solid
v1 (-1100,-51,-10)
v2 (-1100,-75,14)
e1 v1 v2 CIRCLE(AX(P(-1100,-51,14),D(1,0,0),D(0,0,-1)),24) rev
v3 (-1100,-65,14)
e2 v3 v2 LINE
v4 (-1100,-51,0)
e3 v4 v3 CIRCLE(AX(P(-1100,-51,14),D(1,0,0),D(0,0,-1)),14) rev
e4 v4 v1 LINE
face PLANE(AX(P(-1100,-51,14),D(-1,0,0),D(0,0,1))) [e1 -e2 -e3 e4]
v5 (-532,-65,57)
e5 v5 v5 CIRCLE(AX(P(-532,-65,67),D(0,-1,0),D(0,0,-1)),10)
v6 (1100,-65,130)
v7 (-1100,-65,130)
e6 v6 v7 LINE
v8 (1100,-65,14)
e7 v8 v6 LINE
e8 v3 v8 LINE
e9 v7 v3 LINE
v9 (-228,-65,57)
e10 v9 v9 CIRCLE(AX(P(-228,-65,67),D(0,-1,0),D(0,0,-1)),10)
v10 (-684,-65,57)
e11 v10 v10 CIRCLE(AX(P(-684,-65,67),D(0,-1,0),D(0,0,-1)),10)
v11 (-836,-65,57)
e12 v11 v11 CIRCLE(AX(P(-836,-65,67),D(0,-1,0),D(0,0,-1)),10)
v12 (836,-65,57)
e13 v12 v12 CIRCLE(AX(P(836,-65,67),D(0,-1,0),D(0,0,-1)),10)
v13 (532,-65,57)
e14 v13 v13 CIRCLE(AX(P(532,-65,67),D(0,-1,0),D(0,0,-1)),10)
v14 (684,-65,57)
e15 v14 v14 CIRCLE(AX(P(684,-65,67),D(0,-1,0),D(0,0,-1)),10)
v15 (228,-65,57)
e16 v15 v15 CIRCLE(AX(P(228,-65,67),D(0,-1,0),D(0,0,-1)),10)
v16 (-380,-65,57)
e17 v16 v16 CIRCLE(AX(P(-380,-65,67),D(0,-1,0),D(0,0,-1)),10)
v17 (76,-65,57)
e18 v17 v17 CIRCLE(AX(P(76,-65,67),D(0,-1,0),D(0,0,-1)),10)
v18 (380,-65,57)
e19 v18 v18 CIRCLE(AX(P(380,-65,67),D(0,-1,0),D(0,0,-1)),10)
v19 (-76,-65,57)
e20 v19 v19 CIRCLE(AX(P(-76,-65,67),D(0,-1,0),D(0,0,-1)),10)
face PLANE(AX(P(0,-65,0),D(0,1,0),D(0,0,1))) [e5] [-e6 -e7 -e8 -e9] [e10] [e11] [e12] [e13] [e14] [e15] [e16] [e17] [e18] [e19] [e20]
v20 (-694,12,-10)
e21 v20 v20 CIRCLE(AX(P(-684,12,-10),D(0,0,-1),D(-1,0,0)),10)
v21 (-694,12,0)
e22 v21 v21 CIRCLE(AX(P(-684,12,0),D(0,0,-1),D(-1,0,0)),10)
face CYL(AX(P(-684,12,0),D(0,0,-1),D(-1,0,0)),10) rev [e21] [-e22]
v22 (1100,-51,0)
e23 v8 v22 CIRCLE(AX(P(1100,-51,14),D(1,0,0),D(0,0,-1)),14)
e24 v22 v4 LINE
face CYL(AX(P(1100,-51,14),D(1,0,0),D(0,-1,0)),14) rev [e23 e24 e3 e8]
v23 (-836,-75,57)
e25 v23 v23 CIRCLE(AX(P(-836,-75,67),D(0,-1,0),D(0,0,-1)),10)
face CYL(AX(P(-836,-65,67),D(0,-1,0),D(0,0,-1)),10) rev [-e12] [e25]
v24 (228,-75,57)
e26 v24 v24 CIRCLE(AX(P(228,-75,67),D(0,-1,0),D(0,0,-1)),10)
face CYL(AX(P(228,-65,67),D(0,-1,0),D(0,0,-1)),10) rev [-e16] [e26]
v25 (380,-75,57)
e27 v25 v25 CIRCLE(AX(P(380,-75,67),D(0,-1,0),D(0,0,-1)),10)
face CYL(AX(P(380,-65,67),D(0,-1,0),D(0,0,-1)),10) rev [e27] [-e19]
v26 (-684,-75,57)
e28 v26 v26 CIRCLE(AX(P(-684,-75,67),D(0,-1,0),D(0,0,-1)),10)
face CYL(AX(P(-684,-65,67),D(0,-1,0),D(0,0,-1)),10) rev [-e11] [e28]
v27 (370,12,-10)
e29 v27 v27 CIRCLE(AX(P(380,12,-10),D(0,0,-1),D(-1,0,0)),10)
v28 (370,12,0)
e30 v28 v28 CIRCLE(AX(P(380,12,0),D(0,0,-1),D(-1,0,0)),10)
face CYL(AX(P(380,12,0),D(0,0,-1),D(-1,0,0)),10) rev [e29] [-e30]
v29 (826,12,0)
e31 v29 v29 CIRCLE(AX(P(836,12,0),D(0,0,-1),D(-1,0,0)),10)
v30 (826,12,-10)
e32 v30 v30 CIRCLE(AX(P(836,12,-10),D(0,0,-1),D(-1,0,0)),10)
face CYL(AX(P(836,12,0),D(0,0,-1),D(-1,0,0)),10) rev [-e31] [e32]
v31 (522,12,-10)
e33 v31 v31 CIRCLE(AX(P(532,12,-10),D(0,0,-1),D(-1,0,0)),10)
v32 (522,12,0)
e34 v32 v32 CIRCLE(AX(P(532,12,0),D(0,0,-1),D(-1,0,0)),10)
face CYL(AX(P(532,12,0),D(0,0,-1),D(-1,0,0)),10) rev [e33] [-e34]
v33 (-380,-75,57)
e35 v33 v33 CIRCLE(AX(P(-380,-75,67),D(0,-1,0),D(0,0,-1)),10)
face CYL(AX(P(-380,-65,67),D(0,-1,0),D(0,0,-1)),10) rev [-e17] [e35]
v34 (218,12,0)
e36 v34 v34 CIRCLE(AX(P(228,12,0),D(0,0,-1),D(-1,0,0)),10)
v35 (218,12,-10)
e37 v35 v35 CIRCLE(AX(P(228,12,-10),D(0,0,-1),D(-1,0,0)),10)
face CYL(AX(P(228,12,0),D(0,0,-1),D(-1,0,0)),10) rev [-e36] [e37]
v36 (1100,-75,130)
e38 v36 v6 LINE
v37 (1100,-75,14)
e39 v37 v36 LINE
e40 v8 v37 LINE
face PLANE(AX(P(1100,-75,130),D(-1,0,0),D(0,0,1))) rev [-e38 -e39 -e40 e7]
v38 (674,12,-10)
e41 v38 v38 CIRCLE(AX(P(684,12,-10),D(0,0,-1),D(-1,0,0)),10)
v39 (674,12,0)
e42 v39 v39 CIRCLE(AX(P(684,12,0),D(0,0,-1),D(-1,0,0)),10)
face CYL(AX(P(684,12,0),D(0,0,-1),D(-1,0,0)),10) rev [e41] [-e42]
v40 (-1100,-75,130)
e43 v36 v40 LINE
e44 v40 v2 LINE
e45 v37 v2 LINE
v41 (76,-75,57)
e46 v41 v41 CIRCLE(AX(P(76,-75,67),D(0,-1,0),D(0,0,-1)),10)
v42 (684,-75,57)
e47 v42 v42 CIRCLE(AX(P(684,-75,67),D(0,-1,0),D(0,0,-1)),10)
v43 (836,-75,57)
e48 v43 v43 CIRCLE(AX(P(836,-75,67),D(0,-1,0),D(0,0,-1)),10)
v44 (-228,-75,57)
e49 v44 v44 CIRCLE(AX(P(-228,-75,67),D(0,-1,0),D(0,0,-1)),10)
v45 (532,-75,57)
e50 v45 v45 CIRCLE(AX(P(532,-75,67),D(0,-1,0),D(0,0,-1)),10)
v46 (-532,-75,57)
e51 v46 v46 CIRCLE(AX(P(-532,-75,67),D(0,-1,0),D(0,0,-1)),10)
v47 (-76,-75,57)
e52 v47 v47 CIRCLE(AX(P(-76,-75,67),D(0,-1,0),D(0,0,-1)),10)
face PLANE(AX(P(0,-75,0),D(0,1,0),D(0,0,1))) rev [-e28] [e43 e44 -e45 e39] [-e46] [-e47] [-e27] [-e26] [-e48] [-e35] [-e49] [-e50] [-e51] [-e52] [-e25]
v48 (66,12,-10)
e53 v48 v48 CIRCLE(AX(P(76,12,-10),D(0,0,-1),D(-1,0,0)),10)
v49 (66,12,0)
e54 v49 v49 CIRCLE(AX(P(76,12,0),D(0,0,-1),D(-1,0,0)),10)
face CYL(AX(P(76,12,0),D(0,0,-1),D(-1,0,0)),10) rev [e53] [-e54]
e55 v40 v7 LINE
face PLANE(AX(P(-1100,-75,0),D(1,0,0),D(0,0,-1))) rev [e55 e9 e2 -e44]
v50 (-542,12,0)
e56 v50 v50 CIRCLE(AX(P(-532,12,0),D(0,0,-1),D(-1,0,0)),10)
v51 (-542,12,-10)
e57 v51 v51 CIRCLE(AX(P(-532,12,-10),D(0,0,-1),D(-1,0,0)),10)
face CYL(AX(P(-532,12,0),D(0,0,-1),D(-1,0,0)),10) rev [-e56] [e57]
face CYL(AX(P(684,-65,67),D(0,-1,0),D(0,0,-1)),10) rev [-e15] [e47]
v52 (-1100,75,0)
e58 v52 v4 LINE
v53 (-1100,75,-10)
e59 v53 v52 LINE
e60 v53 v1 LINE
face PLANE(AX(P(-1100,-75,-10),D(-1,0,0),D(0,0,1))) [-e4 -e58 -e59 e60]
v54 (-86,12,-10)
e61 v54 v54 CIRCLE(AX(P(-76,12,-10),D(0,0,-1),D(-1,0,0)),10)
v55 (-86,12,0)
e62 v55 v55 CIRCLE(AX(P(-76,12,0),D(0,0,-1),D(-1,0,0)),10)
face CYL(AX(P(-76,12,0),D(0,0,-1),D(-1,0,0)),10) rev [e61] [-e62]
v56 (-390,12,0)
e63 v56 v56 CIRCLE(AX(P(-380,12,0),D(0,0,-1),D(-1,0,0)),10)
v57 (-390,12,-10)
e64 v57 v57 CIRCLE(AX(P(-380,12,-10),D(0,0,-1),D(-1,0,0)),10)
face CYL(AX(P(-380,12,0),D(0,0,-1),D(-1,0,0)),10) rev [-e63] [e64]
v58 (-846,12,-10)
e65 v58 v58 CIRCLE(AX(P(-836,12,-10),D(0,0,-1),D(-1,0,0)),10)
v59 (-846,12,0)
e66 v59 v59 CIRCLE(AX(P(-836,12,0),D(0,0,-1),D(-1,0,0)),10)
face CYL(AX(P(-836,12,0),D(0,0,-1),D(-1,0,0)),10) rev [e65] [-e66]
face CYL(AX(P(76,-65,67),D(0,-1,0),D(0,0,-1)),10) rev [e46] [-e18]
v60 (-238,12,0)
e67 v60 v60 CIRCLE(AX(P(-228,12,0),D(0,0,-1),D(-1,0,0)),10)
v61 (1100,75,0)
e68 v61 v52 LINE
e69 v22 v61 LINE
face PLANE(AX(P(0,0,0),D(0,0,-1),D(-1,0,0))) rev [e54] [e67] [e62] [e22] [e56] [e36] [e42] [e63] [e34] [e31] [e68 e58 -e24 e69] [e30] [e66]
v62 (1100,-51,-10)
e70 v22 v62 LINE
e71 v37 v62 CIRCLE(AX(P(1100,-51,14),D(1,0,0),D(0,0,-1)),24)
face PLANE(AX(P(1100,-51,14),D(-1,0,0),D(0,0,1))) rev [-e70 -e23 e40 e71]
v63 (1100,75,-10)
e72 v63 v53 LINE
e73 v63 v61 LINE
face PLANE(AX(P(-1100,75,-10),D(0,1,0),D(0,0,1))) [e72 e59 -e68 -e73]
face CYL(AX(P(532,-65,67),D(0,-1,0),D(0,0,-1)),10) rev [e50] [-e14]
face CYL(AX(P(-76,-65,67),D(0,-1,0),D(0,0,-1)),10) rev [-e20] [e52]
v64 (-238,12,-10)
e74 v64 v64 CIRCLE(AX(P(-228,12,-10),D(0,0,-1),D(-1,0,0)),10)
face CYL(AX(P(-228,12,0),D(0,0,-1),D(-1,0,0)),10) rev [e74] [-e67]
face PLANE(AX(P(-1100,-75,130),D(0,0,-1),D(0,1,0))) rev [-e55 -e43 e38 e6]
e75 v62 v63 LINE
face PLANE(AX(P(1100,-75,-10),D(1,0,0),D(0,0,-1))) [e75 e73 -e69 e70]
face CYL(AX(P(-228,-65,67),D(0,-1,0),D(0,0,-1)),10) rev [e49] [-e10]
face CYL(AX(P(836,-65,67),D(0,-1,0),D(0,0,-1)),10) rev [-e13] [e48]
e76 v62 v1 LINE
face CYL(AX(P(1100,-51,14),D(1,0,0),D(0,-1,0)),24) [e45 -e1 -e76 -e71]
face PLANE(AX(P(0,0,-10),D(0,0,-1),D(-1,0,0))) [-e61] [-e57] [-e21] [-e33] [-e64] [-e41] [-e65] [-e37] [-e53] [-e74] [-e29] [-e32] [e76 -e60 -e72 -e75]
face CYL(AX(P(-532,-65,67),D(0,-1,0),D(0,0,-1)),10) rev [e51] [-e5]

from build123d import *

# Parameters (mm, degrees)
SKETCH1_W                    = 2200
SKETCH1_H                    = 150
BASE_FLANGE1_DEPTH           = 10
EDGE_FLANGE1_STRIP_W         = 68
EDGE_FLANGE1_STRIP_H         = 10
EDGE_FLANGE1_STRIP_CUT_DEPTH = 2200
EDGE_FLANGE1_DEPTH           = 2200
SKETCH12_R                   = 10
CUT_EXTRUDE1_DEPTH           = 10
SKETCH13_R                   = 10
CUT_EXTRUDE2_DEPTH           = 10
LPATTERN1_COUNT              = 12
LPATTERN1_PITCH              = 152


# Sheet-metal steps are written as plain solids
with BuildPart() as part:
    # Sketch1 → Base-Flange1 (new body)
    with BuildSketch(Plane.XY):
        Rectangle(SKETCH1_W, SKETCH1_H)
    extrude(amount=-BASE_FLANGE1_DEPTH)

    # Edge-Flange1 strip (across the edge) → Edge-Flange1 strip cut (cut)
    with BuildSketch(Plane(origin=(-1100, -75, 0), x_dir=(0, 1, 0), z_dir=(1, 0, 0))):
        with Locations((-10, -5)):
            Rectangle(EDGE_FLANGE1_STRIP_W, EDGE_FLANGE1_STRIP_H)
    extrude(amount=EDGE_FLANGE1_STRIP_CUT_DEPTH, mode=Mode.SUBTRACT)

    # Edge-Flange1 section (across the edge) → Edge-Flange1 (add)
    with BuildSketch(Plane(origin=(-1100, -75, 0), x_dir=(0, 1, 0), z_dir=(1, 0, 0))):
        with BuildLine():
            Line((0, 14), (0, 130))
            Line((0, 130), (10, 130))
            Line((10, 130), (10, 14))
            ThreePointArc((10, 14), (14.100505063, 4.100505063), (24, 0))
            Line((24, 0), (24, -10))
            ThreePointArc((24, -10), (7.029437252, -2.970562748), (0, 14))
        make_face()
    extrude(amount=EDGE_FLANGE1_DEPTH)

    # Sketch12 → Cut-Extrude1 (cut)
    with BuildSketch(Plane(origin=(0, -75, 0), x_dir=(-1, 0, 0), z_dir=(0, -1, 0))):
        with Locations(Location((836, -67, 0), (0, 0, 90))):
            Circle(SKETCH12_R)
    cut_extrude1 = extrude(amount=-CUT_EXTRUDE1_DEPTH, mode=Mode.SUBTRACT)

    # Sketch13 → Cut-Extrude2 (cut)
    with BuildSketch(Plane(origin=(0, 0, -10), x_dir=(-1, 0, 0), z_dir=(0, 0, -1))):
        with Locations((836, 12)):
            Circle(SKETCH13_R)
    cut_extrude2 = extrude(amount=-CUT_EXTRUDE2_DEPTH, mode=Mode.SUBTRACT)

    # LPattern1: Cut-Extrude1, Cut-Extrude2 ×12
    with Locations(*[(i * LPATTERN1_PITCH, 0, 0) for i in range(1, LPATTERN1_COUNT)]):
        add(cut_extrude1, mode=Mode.SUBTRACT)
        add(cut_extrude2, mode=Mode.SUBTRACT)


solid = part.part
